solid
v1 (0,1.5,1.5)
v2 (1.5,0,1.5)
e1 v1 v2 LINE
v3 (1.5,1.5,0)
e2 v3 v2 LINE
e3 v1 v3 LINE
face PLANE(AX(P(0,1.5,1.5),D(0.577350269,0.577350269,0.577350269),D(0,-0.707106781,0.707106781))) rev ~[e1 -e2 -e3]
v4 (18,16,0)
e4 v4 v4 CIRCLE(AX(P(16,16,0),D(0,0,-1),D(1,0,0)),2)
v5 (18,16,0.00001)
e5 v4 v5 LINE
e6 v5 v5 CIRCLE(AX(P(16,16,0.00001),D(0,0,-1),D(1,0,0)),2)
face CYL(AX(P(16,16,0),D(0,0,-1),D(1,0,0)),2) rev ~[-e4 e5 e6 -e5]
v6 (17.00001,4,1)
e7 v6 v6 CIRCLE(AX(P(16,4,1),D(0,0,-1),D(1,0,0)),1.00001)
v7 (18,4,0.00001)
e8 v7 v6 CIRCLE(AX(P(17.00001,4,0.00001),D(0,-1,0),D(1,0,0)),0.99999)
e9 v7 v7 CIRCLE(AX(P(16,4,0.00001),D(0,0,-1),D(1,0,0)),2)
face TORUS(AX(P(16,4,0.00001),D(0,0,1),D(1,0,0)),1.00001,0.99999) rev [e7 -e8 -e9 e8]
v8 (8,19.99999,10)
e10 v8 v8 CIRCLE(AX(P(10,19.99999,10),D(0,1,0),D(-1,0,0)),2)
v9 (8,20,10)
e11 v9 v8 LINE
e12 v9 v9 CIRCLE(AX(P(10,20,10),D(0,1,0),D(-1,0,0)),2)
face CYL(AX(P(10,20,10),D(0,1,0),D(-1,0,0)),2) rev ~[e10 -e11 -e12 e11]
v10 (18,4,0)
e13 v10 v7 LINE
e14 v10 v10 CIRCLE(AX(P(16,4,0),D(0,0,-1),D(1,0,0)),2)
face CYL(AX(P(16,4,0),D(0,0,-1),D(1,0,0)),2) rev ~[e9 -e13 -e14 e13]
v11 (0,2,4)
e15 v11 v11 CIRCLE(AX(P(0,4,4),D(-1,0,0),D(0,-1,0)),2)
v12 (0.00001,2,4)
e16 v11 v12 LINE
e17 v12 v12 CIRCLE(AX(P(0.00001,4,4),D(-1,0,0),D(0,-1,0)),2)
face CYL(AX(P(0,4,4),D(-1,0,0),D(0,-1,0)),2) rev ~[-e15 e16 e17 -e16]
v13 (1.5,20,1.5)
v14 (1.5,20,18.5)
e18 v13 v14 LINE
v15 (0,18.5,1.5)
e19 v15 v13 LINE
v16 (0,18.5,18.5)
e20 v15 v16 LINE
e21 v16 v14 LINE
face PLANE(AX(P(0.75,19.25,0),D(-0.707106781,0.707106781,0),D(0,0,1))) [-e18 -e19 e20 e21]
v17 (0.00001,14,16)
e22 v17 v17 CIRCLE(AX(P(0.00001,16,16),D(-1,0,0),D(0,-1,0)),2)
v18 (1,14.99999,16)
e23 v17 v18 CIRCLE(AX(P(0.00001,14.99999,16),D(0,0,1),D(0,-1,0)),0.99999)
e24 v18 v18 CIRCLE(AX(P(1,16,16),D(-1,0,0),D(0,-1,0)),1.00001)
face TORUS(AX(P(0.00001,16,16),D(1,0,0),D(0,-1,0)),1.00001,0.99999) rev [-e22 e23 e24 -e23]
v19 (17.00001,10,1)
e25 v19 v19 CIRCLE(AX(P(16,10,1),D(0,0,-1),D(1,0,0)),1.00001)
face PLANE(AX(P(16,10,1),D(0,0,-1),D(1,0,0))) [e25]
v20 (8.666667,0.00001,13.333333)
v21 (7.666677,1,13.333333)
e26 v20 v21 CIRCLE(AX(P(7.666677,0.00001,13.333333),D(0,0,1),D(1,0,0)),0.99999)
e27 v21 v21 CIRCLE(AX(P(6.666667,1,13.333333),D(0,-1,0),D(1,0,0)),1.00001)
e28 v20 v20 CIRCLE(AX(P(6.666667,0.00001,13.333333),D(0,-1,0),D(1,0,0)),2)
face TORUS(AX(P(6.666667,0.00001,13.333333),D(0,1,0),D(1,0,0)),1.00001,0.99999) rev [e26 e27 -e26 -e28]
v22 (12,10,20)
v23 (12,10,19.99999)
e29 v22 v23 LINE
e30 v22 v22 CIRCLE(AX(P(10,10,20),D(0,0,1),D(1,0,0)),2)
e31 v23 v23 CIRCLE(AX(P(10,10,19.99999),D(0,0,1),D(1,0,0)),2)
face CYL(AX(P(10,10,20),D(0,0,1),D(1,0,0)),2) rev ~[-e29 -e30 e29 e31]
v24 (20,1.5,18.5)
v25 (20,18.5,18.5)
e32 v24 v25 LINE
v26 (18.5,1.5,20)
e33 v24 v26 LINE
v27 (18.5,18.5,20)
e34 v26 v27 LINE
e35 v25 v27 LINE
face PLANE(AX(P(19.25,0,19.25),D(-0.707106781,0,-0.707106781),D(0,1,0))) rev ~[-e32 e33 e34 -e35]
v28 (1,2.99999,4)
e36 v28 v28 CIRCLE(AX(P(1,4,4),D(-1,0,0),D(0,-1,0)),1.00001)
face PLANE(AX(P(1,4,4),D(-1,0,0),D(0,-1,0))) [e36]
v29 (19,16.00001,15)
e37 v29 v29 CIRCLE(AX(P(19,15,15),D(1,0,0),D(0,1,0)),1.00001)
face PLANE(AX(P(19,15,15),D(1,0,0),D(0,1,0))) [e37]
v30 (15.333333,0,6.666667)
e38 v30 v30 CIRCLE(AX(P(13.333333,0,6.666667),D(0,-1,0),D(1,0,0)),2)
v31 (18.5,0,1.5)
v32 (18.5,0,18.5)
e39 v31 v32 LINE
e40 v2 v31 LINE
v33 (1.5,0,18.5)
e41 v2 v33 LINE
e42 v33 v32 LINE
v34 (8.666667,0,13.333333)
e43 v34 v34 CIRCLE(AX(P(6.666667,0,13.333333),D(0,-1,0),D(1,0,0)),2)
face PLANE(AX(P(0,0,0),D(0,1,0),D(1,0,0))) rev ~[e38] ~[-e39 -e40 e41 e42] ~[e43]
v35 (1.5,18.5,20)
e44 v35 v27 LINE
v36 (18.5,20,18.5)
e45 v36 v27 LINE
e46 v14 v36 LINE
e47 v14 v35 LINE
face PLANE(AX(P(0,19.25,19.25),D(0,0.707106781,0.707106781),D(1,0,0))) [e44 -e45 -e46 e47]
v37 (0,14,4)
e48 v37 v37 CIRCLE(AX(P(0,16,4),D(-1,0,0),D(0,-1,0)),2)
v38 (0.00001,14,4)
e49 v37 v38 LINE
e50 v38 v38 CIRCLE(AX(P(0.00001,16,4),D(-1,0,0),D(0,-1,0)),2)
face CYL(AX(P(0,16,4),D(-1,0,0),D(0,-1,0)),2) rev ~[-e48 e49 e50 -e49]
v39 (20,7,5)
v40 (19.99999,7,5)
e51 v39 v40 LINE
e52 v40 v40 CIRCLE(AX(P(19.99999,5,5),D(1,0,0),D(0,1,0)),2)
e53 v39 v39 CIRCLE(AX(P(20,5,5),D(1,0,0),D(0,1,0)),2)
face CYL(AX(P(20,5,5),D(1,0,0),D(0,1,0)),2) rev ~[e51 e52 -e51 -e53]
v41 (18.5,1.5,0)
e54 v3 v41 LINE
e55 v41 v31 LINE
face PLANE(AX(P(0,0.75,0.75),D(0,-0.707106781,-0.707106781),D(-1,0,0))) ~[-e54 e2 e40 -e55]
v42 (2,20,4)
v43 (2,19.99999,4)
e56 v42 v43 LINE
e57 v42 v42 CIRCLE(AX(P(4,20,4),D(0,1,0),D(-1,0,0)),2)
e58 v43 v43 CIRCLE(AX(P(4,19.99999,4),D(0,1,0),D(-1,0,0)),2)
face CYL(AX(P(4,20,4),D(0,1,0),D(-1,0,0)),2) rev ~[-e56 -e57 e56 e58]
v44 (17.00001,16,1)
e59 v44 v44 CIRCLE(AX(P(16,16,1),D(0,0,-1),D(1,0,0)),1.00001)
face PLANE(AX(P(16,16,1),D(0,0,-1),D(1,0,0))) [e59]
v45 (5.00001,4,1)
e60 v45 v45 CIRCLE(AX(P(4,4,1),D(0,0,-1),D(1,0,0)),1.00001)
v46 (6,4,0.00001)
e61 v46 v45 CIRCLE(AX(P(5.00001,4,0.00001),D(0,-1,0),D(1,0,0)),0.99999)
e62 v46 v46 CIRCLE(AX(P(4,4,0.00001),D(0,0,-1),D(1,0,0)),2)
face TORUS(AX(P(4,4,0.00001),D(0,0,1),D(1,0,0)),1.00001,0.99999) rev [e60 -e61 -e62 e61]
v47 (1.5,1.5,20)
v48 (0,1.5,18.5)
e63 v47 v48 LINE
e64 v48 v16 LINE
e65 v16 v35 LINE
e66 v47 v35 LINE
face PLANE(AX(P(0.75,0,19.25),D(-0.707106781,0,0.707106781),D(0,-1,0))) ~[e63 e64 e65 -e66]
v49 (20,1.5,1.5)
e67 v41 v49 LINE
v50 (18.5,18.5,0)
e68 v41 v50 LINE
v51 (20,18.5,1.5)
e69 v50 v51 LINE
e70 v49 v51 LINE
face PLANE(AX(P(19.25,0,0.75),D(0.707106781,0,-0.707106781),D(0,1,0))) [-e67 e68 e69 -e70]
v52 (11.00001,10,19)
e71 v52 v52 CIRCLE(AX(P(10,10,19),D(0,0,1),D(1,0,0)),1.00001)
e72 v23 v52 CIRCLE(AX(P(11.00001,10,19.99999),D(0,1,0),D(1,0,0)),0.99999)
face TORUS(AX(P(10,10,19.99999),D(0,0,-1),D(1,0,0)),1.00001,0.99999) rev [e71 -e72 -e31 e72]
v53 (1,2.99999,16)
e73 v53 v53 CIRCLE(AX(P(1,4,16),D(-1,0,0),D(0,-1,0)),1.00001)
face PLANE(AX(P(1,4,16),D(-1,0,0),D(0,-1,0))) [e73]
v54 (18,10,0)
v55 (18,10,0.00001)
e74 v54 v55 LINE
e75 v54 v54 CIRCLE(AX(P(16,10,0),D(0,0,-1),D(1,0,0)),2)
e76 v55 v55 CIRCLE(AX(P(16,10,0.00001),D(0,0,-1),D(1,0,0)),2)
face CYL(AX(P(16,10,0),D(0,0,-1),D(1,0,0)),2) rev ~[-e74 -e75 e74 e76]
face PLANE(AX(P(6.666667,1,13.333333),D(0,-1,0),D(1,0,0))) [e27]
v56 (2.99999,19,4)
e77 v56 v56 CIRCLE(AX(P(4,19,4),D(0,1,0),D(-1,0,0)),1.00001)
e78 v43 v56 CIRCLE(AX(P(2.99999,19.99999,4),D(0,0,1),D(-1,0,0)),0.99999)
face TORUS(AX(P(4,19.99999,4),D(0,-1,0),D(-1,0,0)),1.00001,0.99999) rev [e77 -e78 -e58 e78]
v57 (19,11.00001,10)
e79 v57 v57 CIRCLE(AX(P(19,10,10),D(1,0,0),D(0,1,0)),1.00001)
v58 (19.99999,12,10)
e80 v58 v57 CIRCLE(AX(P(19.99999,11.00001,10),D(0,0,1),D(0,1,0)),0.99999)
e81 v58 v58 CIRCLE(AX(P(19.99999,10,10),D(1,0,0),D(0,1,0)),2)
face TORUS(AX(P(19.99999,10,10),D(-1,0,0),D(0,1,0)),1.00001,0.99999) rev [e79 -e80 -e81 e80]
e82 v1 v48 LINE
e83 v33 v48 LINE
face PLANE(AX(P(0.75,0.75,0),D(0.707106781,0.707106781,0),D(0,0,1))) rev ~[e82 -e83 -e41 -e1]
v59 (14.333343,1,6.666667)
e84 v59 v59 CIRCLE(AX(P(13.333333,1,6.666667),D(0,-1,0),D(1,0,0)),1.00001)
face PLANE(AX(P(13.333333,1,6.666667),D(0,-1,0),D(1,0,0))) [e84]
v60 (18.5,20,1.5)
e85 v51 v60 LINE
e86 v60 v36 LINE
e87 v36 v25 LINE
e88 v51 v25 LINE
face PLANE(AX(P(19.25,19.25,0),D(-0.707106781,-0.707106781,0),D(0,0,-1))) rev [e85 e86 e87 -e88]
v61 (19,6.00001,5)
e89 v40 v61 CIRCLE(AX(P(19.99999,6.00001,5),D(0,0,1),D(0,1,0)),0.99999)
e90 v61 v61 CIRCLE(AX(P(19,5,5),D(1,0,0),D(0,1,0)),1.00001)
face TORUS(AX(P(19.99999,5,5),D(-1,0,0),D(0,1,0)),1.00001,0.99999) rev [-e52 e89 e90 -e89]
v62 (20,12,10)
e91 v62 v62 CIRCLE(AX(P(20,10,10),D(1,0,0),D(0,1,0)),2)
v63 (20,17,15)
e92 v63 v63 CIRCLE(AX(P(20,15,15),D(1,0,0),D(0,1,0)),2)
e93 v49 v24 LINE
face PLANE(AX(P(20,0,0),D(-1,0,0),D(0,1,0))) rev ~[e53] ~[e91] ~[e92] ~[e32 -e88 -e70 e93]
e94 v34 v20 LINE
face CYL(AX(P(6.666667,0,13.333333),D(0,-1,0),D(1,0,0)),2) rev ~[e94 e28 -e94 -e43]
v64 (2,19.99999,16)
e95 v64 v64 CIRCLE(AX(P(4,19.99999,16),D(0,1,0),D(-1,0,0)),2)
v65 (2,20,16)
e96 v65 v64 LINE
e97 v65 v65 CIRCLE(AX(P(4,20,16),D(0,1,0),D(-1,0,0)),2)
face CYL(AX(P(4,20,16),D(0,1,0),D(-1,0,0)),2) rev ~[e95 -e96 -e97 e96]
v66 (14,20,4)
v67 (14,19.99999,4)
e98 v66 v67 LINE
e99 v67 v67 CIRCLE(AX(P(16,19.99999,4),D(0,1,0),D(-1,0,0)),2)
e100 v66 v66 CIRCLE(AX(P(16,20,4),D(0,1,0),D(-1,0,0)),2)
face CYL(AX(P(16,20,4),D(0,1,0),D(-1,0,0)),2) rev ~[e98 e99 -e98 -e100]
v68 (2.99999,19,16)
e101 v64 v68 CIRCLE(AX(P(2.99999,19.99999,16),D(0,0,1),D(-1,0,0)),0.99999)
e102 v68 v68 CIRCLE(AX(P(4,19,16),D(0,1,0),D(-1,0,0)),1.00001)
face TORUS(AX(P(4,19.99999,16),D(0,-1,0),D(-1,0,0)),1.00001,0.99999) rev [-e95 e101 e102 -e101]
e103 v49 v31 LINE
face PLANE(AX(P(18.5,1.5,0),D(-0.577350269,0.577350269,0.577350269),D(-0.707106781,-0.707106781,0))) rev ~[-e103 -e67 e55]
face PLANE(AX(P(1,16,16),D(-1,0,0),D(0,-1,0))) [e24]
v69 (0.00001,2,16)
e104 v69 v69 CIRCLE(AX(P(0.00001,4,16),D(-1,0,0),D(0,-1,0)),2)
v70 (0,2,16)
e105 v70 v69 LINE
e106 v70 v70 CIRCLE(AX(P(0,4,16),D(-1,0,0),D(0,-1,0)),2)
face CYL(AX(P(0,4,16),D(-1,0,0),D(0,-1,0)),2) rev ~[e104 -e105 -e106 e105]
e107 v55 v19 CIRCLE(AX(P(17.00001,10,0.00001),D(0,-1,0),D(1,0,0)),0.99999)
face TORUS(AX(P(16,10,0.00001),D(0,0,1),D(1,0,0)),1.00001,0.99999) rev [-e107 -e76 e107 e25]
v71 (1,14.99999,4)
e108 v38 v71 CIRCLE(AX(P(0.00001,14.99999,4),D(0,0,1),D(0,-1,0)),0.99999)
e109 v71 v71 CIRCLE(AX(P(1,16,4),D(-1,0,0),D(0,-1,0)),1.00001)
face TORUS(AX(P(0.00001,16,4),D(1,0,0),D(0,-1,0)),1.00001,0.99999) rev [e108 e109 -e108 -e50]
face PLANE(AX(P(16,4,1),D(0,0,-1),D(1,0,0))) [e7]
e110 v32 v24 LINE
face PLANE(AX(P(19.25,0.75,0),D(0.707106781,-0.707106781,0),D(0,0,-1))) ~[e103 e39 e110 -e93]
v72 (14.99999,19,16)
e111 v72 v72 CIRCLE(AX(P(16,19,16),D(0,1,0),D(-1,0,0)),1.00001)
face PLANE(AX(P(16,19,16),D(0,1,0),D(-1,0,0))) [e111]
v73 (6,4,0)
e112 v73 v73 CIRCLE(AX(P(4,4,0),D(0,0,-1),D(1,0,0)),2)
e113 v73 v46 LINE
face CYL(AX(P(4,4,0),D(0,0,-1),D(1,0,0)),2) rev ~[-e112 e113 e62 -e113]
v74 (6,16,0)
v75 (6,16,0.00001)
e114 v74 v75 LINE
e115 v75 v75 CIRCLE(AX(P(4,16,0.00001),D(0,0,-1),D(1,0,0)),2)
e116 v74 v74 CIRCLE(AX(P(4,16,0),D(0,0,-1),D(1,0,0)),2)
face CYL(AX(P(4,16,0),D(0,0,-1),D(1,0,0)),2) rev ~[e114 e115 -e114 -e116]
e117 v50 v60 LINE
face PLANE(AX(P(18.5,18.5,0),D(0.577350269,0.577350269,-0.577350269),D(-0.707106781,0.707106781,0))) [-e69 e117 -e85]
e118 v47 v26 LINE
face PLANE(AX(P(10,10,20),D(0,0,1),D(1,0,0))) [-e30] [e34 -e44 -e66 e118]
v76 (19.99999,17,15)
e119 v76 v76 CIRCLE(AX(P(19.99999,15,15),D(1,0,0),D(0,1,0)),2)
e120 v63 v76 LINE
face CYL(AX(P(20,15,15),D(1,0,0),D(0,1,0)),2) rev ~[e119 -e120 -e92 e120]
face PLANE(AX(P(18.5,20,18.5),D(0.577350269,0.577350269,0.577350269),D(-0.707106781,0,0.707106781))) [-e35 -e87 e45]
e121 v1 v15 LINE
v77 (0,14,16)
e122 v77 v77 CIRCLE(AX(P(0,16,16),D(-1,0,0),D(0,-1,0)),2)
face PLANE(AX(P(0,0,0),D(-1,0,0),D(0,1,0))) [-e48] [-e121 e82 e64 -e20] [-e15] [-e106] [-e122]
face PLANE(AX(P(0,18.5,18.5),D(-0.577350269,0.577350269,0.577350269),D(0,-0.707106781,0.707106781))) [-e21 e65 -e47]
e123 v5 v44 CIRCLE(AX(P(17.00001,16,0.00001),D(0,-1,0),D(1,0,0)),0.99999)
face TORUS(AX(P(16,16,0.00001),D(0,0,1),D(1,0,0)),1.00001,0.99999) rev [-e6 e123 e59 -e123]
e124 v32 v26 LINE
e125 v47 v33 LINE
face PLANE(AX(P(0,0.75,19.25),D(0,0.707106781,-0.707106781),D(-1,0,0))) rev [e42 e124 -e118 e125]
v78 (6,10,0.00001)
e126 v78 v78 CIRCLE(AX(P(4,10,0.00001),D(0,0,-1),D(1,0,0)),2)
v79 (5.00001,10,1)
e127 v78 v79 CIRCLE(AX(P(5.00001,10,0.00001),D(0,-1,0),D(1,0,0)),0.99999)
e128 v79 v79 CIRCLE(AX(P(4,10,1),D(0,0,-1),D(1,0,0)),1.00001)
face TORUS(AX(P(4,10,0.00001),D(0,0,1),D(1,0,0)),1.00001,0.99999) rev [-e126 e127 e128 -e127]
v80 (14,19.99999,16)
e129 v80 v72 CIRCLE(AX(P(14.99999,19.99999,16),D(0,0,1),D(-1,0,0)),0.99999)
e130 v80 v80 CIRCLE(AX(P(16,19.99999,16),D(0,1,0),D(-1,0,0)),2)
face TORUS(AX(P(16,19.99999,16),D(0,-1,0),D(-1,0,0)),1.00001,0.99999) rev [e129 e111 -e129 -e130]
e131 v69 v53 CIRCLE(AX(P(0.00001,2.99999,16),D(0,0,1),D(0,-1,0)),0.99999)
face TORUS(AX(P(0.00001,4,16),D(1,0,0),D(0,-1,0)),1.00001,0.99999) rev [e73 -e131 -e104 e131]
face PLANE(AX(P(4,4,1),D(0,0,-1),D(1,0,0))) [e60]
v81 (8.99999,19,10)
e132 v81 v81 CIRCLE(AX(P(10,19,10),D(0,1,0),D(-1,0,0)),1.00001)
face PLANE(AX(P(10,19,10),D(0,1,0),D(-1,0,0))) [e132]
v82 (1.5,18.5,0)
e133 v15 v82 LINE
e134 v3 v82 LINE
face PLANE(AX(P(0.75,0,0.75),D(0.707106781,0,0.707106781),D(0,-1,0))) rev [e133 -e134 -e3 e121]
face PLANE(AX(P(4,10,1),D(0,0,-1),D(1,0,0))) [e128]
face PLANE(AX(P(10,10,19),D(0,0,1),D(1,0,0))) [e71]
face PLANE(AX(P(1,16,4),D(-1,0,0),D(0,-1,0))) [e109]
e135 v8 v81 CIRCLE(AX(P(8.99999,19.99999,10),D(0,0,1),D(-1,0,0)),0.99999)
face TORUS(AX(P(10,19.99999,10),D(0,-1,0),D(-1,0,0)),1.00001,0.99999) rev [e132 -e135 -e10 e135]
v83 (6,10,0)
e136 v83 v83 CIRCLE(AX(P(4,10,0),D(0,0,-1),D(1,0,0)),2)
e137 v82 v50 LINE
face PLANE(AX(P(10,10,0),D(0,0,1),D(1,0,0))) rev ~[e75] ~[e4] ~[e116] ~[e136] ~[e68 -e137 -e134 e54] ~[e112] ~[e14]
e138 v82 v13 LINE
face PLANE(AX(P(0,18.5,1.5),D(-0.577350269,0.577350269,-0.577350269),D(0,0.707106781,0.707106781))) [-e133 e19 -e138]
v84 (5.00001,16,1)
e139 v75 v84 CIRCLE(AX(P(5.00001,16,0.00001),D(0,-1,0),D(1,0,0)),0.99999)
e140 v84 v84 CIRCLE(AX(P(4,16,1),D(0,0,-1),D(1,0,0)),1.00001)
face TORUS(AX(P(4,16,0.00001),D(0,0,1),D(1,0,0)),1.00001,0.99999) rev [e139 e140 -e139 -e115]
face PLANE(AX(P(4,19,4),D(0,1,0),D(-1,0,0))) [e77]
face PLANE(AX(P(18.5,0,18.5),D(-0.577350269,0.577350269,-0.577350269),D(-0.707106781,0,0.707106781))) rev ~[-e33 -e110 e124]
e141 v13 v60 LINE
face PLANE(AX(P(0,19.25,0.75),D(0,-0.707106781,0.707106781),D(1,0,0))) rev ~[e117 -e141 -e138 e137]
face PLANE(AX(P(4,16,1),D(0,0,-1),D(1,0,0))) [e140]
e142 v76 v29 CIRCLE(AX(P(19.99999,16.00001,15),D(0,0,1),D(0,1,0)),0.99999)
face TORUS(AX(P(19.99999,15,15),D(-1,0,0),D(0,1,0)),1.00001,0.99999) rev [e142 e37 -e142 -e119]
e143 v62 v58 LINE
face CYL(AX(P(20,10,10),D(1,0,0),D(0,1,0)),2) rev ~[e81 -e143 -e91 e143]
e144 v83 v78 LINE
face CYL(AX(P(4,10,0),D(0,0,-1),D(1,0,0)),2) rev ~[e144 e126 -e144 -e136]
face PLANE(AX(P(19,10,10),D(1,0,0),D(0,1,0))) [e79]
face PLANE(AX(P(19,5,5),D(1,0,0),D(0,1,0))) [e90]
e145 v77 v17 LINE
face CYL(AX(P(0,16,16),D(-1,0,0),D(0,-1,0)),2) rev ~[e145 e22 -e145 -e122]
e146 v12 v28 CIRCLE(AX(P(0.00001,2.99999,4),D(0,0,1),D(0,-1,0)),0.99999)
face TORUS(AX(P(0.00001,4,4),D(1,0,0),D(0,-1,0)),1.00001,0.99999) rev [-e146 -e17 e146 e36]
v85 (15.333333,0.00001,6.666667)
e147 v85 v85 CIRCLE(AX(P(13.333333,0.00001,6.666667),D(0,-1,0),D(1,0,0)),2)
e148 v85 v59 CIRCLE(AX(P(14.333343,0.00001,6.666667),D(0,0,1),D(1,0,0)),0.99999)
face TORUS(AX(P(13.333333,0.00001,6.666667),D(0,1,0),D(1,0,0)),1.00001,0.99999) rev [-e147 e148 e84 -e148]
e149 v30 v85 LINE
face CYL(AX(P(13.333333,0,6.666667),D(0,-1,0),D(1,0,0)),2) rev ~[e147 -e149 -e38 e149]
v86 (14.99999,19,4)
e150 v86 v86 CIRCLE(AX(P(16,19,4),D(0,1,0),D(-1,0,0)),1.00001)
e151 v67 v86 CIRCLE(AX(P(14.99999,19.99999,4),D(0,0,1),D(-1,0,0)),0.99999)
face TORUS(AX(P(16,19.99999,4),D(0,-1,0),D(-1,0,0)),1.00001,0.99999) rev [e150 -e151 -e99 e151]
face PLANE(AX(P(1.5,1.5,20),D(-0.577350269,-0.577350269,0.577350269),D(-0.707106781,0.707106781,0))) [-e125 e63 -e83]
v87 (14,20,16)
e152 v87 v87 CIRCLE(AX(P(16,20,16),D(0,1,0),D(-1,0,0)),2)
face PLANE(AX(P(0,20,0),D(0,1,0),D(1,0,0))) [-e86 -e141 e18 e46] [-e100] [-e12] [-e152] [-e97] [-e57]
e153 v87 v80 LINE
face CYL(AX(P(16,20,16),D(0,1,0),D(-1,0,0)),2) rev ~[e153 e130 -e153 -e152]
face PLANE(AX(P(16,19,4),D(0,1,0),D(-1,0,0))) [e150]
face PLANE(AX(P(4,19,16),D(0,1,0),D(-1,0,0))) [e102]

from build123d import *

# Parameters (mm, degrees)
F0_W      = 20
F0_H      = 20
F1_DEPTH  = 20
F5_R      = 2
F8_DEPTH  = 1
F2_R      = 2
F9_DEPTH  = 1
F3_R      = 2
F10_DEPTH = 1
F7_R      = 2
F11_DEPTH = 1
F4_R      = 2
F12_DEPTH = 1
F6_R      = 2
F13_DEPTH = 1
F14_SIZE  = 1.5
F15_R     = 0.99999


# Not quite as in the source:
# - a fillet or chamfer is up to 0.001 mm smaller than in the source, because OpenCascade refuses the exact size


with BuildPart() as f1:
    # F0 (on Top) → F1 (new body)
    with BuildSketch(Plane.XY):
        with Locations((10, 10)):
            Rectangle(F0_W, F0_H)
    extrude(amount=F1_DEPTH)

    # F5 (on face) → F8 (cut)
    with BuildSketch(Plane(origin=(0, 20, 0), x_dir=(-1, 0, 0), z_dir=(0, 1, 0))):
        with Locations((-16, 16)):
            Circle(F5_R)
        with Locations((-4, 16)):
            Circle(F5_R)
        with Locations((-10, 10)):
            Circle(F5_R)
        with Locations((-4, 4)):
            Circle(F5_R)
        with Locations((-16, 4)):
            Circle(F5_R)
    extrude(amount=-F8_DEPTH, mode=Mode.SUBTRACT)

    # F2 (on face) → F9 (cut)
    with BuildSketch(Plane.XY.offset(20)):
        with Locations((10, 10)):
            Circle(F2_R)
    extrude(amount=-F9_DEPTH, mode=Mode.SUBTRACT)

    # F3 (on face) → F10 (cut)
    with BuildSketch(Plane(origin=(0, 0, 0), x_dir=(1, 0, 0), z_dir=(0, 0, -1))):
        with Locations((16, -16)):
            Circle(F3_R)
        with Locations((16, -10)):
            Circle(F3_R)
        with Locations((16, -4)):
            Circle(F3_R)
        with Locations((4, -4)):
            Circle(F3_R)
        with Locations((4, -10)):
            Circle(F3_R)
        with Locations((4, -16)):
            Circle(F3_R)
    extrude(amount=-F10_DEPTH, mode=Mode.SUBTRACT)

    # F7 (on face) → F11 (cut)
    with BuildSketch(Plane(origin=(0, 0, 0), x_dir=(0, -1, 0), z_dir=(-1, 0, 0))):
        with Locations((-16, 4)):
            Circle(F7_R)
        with Locations((-16, 16)):
            Circle(F7_R)
        with Locations((-4, 16)):
            Circle(F7_R)
        with Locations((-4, 4)):
            Circle(F7_R)
    extrude(amount=-F11_DEPTH, mode=Mode.SUBTRACT)

    # F4 (on face) → F12 (cut)
    with BuildSketch(Plane.XZ):
        with Locations((13.3333333333, 6.6666666667)):
            Circle(F4_R)
        with Locations((6.6666666667, 13.3333333333)):
            Circle(F4_R)
    extrude(amount=-F12_DEPTH, mode=Mode.SUBTRACT)

    # F6 (on face) → F13 (cut)
    with BuildSketch(Plane.YZ.offset(20)):
        with Locations((15, 15)):
            Circle(F6_R)
        with Locations((10, 10)):
            Circle(F6_R)
        with Locations((5, 5)):
            Circle(F6_R)
    extrude(amount=-F13_DEPTH, mode=Mode.SUBTRACT)

    # F14
    f14_edges = [f1.edges().sort_by_distance(p)[0] for p in [
        (20, 10, 20),
        (20, 0, 10),
        (20, 20, 10),
        (20, 10, 0),
        (10, 0, 0),
        (10, 20, 0),
        (0, 10, 0),
        (0, 0, 10),
        (10, 0, 20),
        (10, 20, 20),
        (0, 20, 10),
        (0, 10, 20),
    ]]
    chamfer(f14_edges, length=F14_SIZE)

    # F15 (radius 1 in the source; OpenCascade refuses exactly that, so slightly less here)
    f15_edges = [f1.edges().sort_by_distance(p)[0] for p in [
        (6, 19, 16),
        (12, 19, 10),
        (18, 19, 16),
        (18, 19, 4),
        (6, 19, 4),
        (19, 13, 15),
        (19, 8, 10),
        (19, 3, 5),
        (8, 10, 19),
        (1, 18, 16),
        (1, 18, 4),
        (1, 6, 4),
        (1, 6, 16),
        (4.666667, 1, 13.333333),
        (11.333333, 1, 6.666667),
        (2, 4, 1),
        (2, 10, 1),
        (2, 16, 1),
        (14, 16, 1),
        (14, 10, 1),
        (14, 4, 1),
    ]]
    fillet(f15_edges, radius=F15_R)


solid = f1.part
